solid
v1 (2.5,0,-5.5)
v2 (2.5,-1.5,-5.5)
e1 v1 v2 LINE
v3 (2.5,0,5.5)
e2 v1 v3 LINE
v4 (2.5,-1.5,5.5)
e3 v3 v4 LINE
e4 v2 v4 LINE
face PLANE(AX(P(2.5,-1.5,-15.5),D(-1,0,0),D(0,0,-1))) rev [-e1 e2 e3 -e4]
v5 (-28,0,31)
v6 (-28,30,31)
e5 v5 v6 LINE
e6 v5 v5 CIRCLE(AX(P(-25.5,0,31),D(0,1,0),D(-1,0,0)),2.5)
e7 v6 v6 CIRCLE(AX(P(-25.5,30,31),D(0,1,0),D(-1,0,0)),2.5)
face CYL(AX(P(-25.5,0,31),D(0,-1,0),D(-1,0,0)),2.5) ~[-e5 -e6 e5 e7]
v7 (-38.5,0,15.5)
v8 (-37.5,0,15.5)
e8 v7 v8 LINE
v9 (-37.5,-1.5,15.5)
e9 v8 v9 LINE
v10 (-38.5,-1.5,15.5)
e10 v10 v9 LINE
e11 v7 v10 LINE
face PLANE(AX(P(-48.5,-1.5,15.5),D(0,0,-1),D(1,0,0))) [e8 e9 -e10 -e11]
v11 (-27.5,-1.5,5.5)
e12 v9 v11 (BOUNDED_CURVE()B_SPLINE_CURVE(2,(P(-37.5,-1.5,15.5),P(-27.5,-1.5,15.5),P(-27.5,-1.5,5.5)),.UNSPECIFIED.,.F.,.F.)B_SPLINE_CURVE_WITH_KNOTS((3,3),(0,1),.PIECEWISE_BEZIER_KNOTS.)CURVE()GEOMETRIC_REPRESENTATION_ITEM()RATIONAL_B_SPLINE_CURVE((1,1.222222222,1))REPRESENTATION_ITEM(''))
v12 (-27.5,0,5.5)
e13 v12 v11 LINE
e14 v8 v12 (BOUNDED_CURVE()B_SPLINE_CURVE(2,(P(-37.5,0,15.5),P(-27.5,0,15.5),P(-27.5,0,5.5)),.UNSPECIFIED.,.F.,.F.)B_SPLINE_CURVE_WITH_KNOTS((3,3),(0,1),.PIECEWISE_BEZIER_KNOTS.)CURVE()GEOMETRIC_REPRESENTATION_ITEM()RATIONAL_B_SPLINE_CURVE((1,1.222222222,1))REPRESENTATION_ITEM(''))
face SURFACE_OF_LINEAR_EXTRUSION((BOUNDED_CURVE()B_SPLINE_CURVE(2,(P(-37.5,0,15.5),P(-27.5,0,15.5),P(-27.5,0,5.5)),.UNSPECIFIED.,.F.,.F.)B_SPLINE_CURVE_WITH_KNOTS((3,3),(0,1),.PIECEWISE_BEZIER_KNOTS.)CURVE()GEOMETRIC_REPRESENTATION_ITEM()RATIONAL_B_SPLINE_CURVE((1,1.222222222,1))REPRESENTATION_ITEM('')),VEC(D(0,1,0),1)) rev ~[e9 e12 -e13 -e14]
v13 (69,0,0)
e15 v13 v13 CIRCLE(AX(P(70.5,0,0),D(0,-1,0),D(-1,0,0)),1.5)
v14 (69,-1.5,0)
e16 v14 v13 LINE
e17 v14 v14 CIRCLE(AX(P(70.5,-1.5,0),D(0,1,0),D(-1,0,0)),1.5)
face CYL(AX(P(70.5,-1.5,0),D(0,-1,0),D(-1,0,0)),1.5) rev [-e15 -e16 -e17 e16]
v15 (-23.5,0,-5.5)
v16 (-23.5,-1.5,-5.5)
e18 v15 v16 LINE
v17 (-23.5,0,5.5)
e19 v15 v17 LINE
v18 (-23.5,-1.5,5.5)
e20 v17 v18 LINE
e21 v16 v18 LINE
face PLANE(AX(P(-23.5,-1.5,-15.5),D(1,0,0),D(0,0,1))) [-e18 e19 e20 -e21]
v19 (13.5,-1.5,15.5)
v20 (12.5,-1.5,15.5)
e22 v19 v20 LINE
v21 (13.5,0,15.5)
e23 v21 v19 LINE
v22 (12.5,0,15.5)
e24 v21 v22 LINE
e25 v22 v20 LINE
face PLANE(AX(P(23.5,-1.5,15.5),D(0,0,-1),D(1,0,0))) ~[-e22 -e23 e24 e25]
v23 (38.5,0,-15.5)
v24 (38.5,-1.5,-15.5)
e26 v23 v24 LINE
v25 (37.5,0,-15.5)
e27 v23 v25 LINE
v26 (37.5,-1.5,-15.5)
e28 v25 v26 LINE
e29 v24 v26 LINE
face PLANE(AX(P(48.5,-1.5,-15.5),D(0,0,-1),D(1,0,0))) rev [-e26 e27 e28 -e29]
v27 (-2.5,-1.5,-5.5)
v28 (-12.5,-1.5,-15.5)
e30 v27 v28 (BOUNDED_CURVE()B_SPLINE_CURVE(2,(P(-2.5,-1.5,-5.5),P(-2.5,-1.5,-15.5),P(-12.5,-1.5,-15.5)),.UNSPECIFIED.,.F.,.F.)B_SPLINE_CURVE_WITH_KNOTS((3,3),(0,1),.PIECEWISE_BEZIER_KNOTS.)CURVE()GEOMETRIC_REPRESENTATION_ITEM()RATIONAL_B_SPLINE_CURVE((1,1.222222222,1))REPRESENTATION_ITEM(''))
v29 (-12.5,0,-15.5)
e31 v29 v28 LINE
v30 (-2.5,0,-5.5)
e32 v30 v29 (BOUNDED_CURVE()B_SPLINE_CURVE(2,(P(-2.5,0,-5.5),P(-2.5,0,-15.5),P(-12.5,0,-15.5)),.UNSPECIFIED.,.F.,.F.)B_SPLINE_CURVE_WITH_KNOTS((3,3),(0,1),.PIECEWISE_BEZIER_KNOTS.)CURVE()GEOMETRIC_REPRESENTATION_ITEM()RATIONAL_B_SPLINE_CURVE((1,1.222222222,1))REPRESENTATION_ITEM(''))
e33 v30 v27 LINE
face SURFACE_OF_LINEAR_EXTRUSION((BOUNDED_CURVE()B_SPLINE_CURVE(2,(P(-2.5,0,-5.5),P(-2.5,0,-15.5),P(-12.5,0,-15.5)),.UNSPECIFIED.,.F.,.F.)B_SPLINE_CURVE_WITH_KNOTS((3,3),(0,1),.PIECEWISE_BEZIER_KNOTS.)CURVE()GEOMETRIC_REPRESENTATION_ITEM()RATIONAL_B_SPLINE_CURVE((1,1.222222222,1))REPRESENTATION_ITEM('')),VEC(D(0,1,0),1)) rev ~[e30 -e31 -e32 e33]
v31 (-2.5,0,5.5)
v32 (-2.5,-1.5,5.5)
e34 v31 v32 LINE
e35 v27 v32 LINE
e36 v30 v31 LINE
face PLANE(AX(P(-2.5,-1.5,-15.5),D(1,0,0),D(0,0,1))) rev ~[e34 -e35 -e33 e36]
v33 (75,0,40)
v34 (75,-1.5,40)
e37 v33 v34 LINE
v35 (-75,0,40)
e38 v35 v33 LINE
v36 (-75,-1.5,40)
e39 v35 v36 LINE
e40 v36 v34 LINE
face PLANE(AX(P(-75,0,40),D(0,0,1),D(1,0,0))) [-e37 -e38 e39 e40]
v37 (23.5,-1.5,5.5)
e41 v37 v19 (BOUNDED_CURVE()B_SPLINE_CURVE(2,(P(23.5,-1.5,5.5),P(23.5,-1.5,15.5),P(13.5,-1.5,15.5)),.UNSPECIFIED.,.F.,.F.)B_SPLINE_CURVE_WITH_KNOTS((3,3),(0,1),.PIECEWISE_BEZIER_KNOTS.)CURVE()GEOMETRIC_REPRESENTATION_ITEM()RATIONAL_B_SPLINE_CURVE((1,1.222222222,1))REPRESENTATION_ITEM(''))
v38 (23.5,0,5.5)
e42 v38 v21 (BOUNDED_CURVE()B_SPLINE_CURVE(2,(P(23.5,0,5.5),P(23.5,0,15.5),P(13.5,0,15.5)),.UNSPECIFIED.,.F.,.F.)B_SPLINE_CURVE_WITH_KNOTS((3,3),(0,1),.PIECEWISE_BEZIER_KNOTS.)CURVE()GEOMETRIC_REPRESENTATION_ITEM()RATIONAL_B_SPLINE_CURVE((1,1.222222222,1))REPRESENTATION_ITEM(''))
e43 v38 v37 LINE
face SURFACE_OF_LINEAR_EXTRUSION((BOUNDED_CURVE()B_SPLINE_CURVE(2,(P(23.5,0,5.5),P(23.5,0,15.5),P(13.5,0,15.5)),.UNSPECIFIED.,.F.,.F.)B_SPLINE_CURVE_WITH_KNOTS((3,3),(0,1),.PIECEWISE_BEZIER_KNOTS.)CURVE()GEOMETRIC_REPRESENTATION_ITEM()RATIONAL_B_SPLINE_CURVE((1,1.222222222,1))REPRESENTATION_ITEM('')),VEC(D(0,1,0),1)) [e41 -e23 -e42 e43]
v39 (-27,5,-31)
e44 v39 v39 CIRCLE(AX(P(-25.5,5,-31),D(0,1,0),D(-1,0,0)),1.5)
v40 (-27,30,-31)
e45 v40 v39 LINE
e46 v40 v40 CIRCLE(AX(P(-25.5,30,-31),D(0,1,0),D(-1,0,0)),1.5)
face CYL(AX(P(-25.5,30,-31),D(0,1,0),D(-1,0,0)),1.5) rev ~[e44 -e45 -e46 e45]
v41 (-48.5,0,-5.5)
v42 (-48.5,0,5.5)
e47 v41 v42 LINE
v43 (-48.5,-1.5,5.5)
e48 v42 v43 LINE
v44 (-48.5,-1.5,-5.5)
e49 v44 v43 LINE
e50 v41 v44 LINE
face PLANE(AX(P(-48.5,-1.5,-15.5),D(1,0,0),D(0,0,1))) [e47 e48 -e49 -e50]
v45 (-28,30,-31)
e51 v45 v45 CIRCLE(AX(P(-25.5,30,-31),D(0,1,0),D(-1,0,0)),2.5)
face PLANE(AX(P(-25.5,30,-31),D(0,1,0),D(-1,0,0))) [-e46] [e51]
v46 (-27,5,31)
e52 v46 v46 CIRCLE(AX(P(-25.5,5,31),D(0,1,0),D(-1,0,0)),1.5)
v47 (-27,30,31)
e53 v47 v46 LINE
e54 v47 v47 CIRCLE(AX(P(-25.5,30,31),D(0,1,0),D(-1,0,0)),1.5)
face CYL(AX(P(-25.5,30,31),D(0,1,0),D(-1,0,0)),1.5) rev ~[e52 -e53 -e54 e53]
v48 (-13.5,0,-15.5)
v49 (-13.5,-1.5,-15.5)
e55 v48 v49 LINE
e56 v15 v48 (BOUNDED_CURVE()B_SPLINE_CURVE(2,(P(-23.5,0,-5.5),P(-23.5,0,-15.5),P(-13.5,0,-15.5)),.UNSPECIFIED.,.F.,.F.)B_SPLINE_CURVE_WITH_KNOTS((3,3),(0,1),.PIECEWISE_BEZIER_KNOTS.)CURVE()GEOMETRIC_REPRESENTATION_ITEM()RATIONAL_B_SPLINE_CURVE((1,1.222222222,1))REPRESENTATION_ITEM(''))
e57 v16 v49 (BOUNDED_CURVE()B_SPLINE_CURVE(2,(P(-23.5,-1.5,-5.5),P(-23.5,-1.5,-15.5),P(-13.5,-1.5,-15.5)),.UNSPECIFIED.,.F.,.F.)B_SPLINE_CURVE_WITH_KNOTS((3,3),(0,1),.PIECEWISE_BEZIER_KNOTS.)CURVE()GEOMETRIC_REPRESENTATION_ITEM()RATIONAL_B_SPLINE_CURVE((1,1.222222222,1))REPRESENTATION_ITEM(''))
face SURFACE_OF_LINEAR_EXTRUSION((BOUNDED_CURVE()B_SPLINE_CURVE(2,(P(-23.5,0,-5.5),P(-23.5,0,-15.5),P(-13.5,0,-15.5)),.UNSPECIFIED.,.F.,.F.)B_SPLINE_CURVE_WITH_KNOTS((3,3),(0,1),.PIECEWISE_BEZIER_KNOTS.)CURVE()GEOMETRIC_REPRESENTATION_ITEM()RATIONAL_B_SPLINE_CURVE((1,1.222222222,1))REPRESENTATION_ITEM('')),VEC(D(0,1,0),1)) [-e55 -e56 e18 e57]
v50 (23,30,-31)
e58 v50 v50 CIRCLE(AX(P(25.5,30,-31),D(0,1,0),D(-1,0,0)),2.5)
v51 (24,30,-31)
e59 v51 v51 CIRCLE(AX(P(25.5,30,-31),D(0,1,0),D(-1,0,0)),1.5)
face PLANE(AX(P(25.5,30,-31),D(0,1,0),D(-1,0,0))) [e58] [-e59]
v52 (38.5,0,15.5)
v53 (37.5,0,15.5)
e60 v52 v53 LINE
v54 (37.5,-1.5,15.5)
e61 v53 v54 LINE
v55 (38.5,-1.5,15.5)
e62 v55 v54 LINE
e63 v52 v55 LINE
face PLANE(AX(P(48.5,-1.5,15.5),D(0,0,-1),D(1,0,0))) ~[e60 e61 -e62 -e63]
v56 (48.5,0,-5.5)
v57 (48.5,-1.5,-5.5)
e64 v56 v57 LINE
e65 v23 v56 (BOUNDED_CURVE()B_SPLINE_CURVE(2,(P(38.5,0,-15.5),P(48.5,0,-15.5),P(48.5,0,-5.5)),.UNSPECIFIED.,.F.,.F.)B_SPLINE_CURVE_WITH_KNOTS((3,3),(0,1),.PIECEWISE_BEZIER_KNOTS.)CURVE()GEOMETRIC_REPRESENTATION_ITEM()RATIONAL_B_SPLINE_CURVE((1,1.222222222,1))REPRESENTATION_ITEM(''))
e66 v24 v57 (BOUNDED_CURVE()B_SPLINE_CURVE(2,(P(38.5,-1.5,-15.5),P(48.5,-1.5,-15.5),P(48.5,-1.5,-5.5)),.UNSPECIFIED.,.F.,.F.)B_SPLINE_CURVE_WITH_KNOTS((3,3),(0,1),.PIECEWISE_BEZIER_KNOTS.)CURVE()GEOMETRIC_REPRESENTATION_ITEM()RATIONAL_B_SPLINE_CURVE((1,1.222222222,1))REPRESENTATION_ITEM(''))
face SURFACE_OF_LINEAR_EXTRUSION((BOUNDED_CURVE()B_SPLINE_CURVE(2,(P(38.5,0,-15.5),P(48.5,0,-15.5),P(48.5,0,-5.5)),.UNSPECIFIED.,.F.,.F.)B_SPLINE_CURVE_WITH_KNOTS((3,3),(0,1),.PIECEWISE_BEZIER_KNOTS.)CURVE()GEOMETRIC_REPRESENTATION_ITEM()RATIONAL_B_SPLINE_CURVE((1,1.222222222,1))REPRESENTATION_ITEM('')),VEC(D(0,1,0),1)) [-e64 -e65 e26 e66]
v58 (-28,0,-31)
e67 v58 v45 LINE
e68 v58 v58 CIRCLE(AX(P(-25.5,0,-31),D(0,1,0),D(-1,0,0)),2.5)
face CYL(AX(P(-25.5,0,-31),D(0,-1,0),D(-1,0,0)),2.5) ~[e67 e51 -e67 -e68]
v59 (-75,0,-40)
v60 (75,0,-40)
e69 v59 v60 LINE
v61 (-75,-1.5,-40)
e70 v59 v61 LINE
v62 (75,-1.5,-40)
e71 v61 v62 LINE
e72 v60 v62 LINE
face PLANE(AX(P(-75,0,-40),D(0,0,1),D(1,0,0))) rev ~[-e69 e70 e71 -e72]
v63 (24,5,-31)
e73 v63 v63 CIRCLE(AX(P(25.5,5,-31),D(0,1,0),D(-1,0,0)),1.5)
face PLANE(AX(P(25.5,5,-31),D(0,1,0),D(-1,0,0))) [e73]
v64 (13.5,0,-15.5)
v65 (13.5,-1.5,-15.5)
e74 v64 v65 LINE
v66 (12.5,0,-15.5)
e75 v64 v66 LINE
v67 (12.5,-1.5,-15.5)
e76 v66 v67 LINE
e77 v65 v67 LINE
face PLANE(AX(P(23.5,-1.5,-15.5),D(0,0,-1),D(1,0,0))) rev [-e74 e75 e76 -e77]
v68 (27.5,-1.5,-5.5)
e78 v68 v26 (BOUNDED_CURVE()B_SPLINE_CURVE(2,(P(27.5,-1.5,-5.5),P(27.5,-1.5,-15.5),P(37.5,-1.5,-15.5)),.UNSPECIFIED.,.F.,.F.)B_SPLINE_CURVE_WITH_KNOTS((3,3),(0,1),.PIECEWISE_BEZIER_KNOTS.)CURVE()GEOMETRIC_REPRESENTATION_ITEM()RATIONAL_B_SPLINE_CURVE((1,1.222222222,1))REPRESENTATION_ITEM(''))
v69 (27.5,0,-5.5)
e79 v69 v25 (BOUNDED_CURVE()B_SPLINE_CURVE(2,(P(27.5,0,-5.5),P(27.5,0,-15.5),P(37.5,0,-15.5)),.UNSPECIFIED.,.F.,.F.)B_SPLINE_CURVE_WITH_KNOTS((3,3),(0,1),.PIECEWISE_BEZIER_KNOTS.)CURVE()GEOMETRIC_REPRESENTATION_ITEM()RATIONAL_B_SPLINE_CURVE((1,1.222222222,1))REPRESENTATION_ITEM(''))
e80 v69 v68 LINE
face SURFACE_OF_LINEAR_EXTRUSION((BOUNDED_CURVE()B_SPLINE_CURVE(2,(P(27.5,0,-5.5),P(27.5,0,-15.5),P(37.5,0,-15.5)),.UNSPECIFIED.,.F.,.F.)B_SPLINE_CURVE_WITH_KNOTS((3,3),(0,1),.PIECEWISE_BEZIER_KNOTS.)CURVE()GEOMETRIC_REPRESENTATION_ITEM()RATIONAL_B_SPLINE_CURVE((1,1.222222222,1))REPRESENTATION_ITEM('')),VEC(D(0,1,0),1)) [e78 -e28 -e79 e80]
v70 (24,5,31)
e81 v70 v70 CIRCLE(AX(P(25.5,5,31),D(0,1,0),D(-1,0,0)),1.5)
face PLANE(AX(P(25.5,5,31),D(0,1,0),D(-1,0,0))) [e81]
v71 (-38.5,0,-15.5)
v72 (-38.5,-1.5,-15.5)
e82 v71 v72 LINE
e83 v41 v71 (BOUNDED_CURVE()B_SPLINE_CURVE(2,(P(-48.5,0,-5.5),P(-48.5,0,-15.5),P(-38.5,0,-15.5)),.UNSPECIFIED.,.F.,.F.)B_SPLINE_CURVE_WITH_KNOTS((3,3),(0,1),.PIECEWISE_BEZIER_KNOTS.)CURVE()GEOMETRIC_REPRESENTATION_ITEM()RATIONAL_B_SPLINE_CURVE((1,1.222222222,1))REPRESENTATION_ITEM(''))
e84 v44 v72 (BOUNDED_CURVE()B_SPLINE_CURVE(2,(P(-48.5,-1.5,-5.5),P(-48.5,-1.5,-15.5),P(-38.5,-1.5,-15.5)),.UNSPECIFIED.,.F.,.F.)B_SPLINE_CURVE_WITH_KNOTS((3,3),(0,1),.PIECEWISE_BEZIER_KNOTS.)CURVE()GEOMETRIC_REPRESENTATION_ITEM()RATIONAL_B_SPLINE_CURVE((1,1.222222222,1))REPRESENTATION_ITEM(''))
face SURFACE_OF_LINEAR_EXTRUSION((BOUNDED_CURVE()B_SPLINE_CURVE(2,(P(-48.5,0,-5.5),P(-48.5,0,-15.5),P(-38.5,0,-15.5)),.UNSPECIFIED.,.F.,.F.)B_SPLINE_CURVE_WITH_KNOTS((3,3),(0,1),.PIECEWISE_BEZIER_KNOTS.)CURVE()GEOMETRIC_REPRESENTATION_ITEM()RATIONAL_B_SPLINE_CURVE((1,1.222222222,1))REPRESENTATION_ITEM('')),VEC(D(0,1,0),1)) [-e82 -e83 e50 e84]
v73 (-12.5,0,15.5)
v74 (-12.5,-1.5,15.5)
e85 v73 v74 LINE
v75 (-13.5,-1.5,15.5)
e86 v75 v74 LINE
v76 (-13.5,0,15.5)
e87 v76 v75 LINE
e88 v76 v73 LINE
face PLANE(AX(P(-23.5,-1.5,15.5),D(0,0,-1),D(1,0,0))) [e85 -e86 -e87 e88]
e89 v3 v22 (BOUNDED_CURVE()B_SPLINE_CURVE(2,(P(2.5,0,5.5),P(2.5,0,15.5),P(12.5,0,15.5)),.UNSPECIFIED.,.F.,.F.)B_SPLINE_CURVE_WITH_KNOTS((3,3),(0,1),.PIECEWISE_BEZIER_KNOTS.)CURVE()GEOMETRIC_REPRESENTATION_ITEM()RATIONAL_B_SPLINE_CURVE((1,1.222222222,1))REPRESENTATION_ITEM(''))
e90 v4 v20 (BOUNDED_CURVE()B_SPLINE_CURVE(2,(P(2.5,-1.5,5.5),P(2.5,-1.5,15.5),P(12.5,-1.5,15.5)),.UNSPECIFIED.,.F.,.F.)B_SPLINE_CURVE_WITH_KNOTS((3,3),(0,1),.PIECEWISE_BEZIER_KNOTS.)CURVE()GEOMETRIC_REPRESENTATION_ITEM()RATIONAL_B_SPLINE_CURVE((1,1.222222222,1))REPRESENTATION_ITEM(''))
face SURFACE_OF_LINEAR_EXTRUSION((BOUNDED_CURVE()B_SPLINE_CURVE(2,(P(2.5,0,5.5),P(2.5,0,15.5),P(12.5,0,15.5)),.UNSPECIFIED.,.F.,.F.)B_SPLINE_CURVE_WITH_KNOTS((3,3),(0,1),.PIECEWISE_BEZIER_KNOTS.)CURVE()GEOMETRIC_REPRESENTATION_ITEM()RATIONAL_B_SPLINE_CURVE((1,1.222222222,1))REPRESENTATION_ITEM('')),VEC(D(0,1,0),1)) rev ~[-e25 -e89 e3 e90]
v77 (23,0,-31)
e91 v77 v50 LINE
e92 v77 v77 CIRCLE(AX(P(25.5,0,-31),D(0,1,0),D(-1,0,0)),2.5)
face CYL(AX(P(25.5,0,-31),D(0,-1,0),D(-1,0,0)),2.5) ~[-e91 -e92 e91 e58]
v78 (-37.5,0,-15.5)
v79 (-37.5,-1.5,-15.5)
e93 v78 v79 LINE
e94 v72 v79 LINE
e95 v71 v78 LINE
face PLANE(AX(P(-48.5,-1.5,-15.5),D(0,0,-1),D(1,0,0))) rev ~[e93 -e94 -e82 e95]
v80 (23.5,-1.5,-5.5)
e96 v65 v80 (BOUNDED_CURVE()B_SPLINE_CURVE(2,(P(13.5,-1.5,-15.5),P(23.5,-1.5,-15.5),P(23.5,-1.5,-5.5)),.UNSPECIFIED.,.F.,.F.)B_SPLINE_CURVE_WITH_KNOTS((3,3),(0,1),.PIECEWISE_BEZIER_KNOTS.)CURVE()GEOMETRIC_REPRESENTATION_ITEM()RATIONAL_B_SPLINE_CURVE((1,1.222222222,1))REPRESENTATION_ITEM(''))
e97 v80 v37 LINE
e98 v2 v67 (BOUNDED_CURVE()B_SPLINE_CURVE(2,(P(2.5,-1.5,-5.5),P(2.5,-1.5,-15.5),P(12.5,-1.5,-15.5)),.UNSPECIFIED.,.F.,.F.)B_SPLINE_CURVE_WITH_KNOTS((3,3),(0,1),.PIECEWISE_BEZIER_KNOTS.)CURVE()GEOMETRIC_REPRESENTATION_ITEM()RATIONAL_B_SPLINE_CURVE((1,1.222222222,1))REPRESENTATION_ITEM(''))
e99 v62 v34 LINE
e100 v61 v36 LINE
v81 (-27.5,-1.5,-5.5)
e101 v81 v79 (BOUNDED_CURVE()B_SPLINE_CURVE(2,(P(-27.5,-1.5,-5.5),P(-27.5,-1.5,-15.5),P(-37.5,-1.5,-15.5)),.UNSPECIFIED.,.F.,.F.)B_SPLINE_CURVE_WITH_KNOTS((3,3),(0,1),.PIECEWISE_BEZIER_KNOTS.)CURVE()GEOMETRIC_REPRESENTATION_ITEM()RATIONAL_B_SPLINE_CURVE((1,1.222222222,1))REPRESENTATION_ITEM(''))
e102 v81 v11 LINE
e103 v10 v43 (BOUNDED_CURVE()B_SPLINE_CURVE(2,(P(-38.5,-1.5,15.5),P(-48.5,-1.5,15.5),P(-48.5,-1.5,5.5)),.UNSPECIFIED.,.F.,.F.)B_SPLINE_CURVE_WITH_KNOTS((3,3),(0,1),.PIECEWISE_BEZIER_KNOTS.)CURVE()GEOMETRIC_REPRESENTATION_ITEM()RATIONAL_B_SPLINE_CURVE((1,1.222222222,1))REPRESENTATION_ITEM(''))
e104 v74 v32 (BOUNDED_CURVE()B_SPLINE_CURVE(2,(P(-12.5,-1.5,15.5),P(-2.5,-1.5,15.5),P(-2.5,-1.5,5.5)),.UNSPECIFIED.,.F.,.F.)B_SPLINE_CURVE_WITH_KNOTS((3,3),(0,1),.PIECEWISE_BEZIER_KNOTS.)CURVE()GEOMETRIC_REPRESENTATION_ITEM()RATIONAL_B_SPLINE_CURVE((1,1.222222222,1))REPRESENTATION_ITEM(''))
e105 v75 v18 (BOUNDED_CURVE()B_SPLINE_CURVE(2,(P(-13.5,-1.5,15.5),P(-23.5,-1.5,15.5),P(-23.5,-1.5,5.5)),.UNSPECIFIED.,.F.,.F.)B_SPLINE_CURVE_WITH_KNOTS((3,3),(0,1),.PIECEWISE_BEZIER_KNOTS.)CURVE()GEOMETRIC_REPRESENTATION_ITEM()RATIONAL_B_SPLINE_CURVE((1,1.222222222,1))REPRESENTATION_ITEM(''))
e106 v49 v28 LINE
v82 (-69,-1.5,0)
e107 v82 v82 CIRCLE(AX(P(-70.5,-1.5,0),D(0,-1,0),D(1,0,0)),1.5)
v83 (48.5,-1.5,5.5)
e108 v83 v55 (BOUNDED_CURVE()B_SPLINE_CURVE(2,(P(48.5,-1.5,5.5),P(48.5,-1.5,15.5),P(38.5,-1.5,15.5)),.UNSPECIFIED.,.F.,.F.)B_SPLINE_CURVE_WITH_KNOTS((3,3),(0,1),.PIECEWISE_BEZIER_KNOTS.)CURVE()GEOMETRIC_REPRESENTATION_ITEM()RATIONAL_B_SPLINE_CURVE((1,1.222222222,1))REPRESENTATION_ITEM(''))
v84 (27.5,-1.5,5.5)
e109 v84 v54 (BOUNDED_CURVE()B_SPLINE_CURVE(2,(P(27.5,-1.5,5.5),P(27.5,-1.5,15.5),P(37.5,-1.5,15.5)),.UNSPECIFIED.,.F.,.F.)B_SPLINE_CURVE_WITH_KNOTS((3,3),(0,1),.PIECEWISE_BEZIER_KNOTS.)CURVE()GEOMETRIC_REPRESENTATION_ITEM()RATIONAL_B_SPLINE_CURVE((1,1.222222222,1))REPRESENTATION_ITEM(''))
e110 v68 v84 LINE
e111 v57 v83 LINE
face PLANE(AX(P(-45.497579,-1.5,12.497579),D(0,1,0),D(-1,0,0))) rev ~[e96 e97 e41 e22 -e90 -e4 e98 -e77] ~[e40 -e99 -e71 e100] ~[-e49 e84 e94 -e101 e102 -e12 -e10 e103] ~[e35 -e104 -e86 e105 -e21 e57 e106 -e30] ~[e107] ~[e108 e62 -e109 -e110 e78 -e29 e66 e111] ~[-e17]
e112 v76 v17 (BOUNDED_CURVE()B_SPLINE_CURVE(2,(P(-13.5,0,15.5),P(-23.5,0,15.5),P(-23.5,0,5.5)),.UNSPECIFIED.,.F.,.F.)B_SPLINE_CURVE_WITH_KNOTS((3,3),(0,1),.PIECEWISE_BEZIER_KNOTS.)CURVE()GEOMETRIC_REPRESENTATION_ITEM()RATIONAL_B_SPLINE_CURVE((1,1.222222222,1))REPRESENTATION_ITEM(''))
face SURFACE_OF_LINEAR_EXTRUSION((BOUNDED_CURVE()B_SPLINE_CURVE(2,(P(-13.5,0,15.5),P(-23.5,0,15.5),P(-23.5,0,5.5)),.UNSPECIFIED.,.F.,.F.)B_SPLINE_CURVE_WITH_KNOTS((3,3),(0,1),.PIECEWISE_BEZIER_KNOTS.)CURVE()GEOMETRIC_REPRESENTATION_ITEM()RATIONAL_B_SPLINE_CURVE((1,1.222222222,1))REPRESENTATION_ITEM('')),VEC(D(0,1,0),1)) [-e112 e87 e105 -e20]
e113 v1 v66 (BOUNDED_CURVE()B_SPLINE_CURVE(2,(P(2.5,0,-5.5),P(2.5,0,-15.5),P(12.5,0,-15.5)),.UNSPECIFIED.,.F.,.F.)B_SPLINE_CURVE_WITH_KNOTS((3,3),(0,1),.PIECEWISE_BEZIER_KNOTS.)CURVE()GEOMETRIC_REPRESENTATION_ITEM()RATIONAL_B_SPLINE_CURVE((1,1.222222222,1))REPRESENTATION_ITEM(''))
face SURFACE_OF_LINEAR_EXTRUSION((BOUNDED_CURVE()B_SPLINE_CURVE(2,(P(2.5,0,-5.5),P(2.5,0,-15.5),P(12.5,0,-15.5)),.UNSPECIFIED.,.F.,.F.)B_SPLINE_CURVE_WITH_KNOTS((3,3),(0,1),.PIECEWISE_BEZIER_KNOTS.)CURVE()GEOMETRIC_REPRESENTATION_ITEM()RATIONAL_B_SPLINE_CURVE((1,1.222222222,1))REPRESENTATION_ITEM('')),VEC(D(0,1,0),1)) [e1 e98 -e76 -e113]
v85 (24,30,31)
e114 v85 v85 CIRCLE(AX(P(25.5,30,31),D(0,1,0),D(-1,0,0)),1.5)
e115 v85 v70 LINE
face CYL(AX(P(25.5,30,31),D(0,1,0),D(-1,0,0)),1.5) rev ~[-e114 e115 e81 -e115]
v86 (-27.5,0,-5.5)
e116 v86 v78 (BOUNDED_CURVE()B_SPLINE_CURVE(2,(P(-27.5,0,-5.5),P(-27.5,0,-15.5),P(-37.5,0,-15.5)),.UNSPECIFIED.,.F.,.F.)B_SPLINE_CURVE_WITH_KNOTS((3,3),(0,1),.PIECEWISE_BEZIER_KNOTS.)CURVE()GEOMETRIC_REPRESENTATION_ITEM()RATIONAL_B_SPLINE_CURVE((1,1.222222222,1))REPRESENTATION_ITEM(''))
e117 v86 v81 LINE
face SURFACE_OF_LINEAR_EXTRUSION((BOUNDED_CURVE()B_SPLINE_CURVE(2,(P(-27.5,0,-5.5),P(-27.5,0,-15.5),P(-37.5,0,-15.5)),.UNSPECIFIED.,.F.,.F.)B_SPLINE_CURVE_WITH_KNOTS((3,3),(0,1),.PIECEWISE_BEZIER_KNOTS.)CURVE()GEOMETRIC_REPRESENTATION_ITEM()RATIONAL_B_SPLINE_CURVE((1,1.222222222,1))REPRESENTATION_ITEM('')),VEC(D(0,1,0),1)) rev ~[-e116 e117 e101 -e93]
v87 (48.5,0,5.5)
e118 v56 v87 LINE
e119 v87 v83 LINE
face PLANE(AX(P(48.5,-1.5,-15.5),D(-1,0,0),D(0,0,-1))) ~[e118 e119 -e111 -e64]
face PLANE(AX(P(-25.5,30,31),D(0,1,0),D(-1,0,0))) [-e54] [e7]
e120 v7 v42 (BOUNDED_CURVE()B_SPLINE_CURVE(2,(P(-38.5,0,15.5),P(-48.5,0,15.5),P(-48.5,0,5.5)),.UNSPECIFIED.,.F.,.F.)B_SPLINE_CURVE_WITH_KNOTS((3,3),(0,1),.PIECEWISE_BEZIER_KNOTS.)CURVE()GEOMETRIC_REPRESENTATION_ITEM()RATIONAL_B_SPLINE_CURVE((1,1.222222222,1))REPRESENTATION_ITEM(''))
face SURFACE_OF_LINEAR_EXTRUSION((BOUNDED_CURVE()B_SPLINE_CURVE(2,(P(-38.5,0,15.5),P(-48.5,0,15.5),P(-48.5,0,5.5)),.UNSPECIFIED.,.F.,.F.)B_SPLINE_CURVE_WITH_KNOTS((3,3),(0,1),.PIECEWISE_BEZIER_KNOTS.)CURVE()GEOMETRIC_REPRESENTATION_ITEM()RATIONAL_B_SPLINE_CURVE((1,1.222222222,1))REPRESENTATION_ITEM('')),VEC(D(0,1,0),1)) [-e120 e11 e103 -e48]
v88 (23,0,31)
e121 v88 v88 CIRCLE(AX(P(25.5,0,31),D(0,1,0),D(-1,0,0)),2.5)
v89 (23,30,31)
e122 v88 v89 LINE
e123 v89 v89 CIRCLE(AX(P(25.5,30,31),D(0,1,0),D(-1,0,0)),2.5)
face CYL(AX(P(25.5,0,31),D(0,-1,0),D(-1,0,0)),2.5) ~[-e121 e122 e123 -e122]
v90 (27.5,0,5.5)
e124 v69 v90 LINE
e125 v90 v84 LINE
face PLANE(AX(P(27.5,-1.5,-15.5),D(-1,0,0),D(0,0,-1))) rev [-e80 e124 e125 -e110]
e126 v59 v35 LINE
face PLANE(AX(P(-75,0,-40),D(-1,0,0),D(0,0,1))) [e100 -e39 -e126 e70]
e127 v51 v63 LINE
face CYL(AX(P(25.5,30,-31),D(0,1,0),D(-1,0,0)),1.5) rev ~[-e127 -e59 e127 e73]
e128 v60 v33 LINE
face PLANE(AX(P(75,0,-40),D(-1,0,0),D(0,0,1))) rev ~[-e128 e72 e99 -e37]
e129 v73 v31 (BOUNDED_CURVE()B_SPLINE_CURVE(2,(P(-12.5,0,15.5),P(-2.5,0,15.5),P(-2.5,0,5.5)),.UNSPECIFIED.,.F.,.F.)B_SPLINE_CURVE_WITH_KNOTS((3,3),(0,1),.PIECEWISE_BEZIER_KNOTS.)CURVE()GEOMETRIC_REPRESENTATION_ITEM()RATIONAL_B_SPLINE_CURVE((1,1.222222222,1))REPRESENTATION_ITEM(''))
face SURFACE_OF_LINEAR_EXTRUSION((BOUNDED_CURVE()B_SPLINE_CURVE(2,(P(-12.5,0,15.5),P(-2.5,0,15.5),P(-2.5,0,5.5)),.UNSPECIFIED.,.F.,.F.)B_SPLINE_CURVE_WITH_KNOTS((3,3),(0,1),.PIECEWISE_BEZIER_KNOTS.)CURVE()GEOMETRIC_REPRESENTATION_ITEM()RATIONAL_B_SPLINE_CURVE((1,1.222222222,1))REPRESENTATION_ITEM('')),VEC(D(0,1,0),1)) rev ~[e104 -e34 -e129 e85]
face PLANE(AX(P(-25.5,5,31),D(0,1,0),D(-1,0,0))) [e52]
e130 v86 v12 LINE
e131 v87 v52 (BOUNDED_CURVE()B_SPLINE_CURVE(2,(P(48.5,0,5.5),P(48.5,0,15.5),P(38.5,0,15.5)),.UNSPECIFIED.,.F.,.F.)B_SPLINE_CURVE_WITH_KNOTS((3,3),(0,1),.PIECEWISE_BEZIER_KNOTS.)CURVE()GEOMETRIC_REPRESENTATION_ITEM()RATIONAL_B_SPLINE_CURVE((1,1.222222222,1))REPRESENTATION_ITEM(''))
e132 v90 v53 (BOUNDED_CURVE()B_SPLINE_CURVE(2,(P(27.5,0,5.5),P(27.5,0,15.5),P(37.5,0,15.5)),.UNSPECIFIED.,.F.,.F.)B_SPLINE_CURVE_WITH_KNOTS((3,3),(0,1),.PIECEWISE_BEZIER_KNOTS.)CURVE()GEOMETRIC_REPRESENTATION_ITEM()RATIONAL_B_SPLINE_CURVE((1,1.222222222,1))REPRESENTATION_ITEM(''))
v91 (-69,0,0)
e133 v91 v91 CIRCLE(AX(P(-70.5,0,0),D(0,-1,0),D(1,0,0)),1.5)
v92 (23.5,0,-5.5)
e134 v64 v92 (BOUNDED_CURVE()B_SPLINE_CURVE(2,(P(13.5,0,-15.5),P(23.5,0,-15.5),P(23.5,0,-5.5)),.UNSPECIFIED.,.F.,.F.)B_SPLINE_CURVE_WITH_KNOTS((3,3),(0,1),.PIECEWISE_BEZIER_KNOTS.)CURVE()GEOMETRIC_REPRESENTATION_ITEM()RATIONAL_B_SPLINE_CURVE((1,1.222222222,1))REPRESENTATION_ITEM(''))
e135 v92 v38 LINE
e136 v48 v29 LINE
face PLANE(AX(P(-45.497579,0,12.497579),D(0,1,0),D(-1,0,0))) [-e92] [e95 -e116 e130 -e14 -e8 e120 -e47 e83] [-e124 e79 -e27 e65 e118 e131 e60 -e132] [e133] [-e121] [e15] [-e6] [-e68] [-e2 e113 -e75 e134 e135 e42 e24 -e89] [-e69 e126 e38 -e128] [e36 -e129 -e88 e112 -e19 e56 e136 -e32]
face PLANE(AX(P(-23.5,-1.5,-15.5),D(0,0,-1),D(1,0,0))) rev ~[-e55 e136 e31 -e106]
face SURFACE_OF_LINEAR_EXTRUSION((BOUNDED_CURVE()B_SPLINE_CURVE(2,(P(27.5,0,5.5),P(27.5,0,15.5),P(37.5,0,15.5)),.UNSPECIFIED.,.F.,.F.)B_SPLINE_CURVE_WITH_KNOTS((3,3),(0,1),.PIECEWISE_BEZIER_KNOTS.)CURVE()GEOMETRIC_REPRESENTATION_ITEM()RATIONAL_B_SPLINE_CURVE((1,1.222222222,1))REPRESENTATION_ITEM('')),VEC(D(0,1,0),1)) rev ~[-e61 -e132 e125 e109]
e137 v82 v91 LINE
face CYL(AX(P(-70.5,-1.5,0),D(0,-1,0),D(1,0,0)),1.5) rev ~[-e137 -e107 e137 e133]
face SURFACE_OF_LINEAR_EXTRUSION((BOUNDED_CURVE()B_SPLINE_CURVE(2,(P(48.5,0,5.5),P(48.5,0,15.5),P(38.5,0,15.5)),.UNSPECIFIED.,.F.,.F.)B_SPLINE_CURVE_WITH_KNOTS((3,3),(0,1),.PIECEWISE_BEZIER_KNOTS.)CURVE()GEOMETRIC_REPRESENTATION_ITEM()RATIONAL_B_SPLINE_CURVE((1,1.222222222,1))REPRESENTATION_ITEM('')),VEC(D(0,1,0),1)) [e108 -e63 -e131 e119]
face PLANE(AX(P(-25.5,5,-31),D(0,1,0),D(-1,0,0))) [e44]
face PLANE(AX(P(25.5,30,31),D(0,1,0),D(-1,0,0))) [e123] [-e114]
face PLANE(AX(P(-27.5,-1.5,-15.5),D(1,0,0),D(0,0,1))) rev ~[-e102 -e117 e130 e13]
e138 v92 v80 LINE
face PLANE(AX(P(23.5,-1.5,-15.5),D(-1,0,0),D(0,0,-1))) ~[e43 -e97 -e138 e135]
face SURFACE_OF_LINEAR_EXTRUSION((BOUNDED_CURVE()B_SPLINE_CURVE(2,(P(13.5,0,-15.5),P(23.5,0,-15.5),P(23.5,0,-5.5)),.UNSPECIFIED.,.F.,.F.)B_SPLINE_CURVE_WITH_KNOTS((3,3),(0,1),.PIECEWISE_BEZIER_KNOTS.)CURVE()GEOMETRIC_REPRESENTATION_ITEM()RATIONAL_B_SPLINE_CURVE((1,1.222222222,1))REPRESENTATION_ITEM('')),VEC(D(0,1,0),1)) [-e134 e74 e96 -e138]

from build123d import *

# Parameters (mm, degrees)
F0_W         = 150
F0_H         = 80
F1_DEPTH     = 1.5
F2_R         = 2.5
F3_DEPTH     = 30
F4_R         = 1.5
F5_R         = 1.5
F6_R         = 1.5
F7_R         = 1.5
F8_DEPTH     = 25
F9_R         = 1.5
F9_W         = 21
F9_H         = 31
F10_DEPTH    = 3
F12_T1_DEPTH = 1.5


# Not quite as in the source:
# - a fillet or chamfer that OpenCascade refuses, or shapes differently, is made with other operations: its cross-section is extruded or revolved along the edge and cut away or added


with BuildPart() as f1:
    # F0 (on Front) → F1 (new body)
    with BuildSketch(Plane.XZ):
        Rectangle(F0_W, F0_H)
    extrude(amount=F1_DEPTH)

    # F2 (on face) → F3 (join)
    with BuildSketch(Plane(origin=(0, 0, 0), x_dir=(-1, 0, 0), z_dir=(0, 1, 0))):
        with Locations((-25.5, 31)):
            Circle(F2_R)
        with Locations((-25.5, -31)):
            Circle(F2_R)
        with Locations((25.5, -31)):
            Circle(F2_R)
        with Locations((25.5, 31)):
            Circle(F2_R)
    extrude(amount=F3_DEPTH)

    # F4 (on face) + F5 (on face) + F6 (on face) + F7 (on face) → F8 (cut)
    with BuildSketch(Plane(origin=(0, 30, 0), x_dir=(-1, 0, 0), z_dir=(0, 1, 0))):
        with Locations((-25.5, 31)):
            Circle(F4_R)
    with BuildSketch(Plane(origin=(0, 30, 0), x_dir=(-1, 0, 0), z_dir=(0, 1, 0))):
        with Locations((25.5, 31)):
            Circle(F5_R)
    with BuildSketch(Plane(origin=(0, 30, 0), x_dir=(-1, 0, 0), z_dir=(0, 1, 0))):
        with Locations((-25.5, -31)):
            Circle(F6_R)
    with BuildSketch(Plane(origin=(0, 30, 0), x_dir=(-1, 0, 0), z_dir=(0, 1, 0))):
        with Locations((25.5, -31)):
            Circle(F7_R)
    extrude(amount=-F8_DEPTH, mode=Mode.SUBTRACT)

    # F9 (on face) → F10 (cut)
    with BuildSketch(Plane.XZ.offset(1.5)):
        with Locations((-70.5, 0)):
            Circle(F9_R)
        with Locations((-38, 0)):
            Rectangle(F9_W, F9_H)
        with Locations((-13, 0)):
            Rectangle(F9_W, F9_H)
    f10 = extrude(amount=-F10_DEPTH, mode=Mode.SUBTRACT)

    # F11: F10 across plane
    add(f10.mirror(Plane.YZ), mode=Mode.SUBTRACT)

    # F12: fillet of radius 10 on 16 edges, made by hand

    # F12_s2 → F12_t1 (join)
    with BuildSketch(Plane.XZ):
        with BuildLine():
            add(Edge.make_bspline(
                [(-38.5, 15.5), (-48.5, 15.5), (-48.5, 5.5)],
                knots=[0, 0, 0, 1, 1, 1], degree=2, weights=[1, 1.2222222222, 1]))
            Line((-48.5, 5.5), (-48.5, 15.5))
            Line((-48.5, 15.5), (-38.5, 15.5))
        make_face()
        with BuildLine():
            add(Edge.make_bspline(
                [(-37.5, 15.5), (-27.5, 15.5), (-27.5, 5.5)],
                knots=[0, 0, 0, 1, 1, 1], degree=2, weights=[1, 1.2222222222, 1]))
            Line((-27.5, 5.5), (-27.5, 15.5))
            Line((-27.5, 15.5), (-37.5, 15.5))
        make_face()
        with BuildLine():
            add(Edge.make_bspline(
                [(-48.5, -5.5), (-48.5, -15.5), (-38.5, -15.5)],
                knots=[0, 0, 0, 1, 1, 1], degree=2, weights=[1, 1.2222222222, 1]))
            Line((-38.5, -15.5), (-48.5, -15.5))
            Line((-48.5, -15.5), (-48.5, -5.5))
        make_face()
        with BuildLine():
            add(Edge.make_bspline(
                [(-27.5, -5.5), (-27.5, -15.5), (-37.5, -15.5)],
                knots=[0, 0, 0, 1, 1, 1], degree=2, weights=[1, 1.2222222222, 1]))
            Line((-37.5, -15.5), (-27.5, -15.5))
            Line((-27.5, -15.5), (-27.5, -5.5))
        make_face()
        with BuildLine():
            add(Edge.make_bspline(
                [(-2.5, -5.5), (-2.5, -15.5), (-12.5, -15.5)],
                knots=[0, 0, 0, 1, 1, 1], degree=2, weights=[1, 1.2222222222, 1]))
            Line((-12.5, -15.5), (-2.5, -15.5))
            Line((-2.5, -15.5), (-2.5, -5.5))
        make_face()
        with BuildLine():
            add(Edge.make_bspline(
                [(-13.5, 15.5), (-23.5, 15.5), (-23.5, 5.5)],
                knots=[0, 0, 0, 1, 1, 1], degree=2, weights=[1, 1.2222222222, 1]))
            Line((-23.5, 5.5), (-23.5, 15.5))
            Line((-23.5, 15.5), (-13.5, 15.5))
        make_face()
        with BuildLine():
            add(Edge.make_bspline(
                [(-23.5, -5.5), (-23.5, -15.5), (-13.5, -15.5)],
                knots=[0, 0, 0, 1, 1, 1], degree=2, weights=[1, 1.2222222222, 1]))
            Line((-13.5, -15.5), (-23.5, -15.5))
            Line((-23.5, -15.5), (-23.5, -5.5))
        make_face()
        with BuildLine():
            add(Edge.make_bspline(
                [(-12.5, 15.5), (-2.5, 15.5), (-2.5, 5.5)],
                knots=[0, 0, 0, 1, 1, 1], degree=2, weights=[1, 1.2222222222, 1]))
            Line((-2.5, 5.5), (-2.5, 15.5))
            Line((-2.5, 15.5), (-12.5, 15.5))
        make_face()
        with BuildLine():
            add(Edge.make_bspline(
                [(23.5, 5.5), (23.5, 15.5), (13.5, 15.5)],
                knots=[0, 0, 0, 1, 1, 1], degree=2, weights=[1, 1.2222222222, 1]))
            Line((13.5, 15.5), (23.5, 15.5))
            Line((23.5, 15.5), (23.5, 5.5))
        make_face()
        with BuildLine():
            add(Edge.make_bspline(
                [(48.5, 5.5), (48.5, 15.5), (38.5, 15.5)],
                knots=[0, 0, 0, 1, 1, 1], degree=2, weights=[1, 1.2222222222, 1]))
            Line((38.5, 15.5), (48.5, 15.5))
            Line((48.5, 15.5), (48.5, 5.5))
        make_face()
        with BuildLine():
            add(Edge.make_bspline(
                [(2.5, -5.5), (2.5, -15.5), (12.5, -15.5)],
                knots=[0, 0, 0, 1, 1, 1], degree=2, weights=[1, 1.2222222222, 1]))
            Line((12.5, -15.5), (2.5, -15.5))
            Line((2.5, -15.5), (2.5, -5.5))
        make_face()
        with BuildLine():
            add(Edge.make_bspline(
                [(27.5, -5.5), (27.5, -15.5), (37.5, -15.5)],
                knots=[0, 0, 0, 1, 1, 1], degree=2, weights=[1, 1.2222222222, 1]))
            Line((37.5, -15.5), (27.5, -15.5))
            Line((27.5, -15.5), (27.5, -5.5))
        make_face()
        with BuildLine():
            add(Edge.make_bspline(
                [(27.5, 5.5), (27.5, 15.5), (37.5, 15.5)],
                knots=[0, 0, 0, 1, 1, 1], degree=2, weights=[1, 1.2222222222, 1]))
            Line((37.5, 15.5), (27.5, 15.5))
            Line((27.5, 15.5), (27.5, 5.5))
        make_face()
        with BuildLine():
            add(Edge.make_bspline(
                [(2.5, 5.5), (2.5, 15.5), (12.5, 15.5)],
                knots=[0, 0, 0, 1, 1, 1], degree=2, weights=[1, 1.2222222222, 1]))
            Line((12.5, 15.5), (2.5, 15.5))
            Line((2.5, 15.5), (2.5, 5.5))
        make_face()
        with BuildLine():
            add(Edge.make_bspline(
                [(38.5, -15.5), (48.5, -15.5), (48.5, -5.5)],
                knots=[0, 0, 0, 1, 1, 1], degree=2, weights=[1, 1.2222222222, 1]))
            Line((48.5, -5.5), (48.5, -15.5))
            Line((48.5, -15.5), (38.5, -15.5))
        make_face()
        with BuildLine():
            add(Edge.make_bspline(
                [(13.5, -15.5), (23.5, -15.5), (23.5, -5.5)],
                knots=[0, 0, 0, 1, 1, 1], degree=2, weights=[1, 1.2222222222, 1]))
            Line((23.5, -5.5), (23.5, -15.5))
            Line((23.5, -15.5), (13.5, -15.5))
        make_face()
    extrude(amount=F12_T1_DEPTH)


solid = f1.part
